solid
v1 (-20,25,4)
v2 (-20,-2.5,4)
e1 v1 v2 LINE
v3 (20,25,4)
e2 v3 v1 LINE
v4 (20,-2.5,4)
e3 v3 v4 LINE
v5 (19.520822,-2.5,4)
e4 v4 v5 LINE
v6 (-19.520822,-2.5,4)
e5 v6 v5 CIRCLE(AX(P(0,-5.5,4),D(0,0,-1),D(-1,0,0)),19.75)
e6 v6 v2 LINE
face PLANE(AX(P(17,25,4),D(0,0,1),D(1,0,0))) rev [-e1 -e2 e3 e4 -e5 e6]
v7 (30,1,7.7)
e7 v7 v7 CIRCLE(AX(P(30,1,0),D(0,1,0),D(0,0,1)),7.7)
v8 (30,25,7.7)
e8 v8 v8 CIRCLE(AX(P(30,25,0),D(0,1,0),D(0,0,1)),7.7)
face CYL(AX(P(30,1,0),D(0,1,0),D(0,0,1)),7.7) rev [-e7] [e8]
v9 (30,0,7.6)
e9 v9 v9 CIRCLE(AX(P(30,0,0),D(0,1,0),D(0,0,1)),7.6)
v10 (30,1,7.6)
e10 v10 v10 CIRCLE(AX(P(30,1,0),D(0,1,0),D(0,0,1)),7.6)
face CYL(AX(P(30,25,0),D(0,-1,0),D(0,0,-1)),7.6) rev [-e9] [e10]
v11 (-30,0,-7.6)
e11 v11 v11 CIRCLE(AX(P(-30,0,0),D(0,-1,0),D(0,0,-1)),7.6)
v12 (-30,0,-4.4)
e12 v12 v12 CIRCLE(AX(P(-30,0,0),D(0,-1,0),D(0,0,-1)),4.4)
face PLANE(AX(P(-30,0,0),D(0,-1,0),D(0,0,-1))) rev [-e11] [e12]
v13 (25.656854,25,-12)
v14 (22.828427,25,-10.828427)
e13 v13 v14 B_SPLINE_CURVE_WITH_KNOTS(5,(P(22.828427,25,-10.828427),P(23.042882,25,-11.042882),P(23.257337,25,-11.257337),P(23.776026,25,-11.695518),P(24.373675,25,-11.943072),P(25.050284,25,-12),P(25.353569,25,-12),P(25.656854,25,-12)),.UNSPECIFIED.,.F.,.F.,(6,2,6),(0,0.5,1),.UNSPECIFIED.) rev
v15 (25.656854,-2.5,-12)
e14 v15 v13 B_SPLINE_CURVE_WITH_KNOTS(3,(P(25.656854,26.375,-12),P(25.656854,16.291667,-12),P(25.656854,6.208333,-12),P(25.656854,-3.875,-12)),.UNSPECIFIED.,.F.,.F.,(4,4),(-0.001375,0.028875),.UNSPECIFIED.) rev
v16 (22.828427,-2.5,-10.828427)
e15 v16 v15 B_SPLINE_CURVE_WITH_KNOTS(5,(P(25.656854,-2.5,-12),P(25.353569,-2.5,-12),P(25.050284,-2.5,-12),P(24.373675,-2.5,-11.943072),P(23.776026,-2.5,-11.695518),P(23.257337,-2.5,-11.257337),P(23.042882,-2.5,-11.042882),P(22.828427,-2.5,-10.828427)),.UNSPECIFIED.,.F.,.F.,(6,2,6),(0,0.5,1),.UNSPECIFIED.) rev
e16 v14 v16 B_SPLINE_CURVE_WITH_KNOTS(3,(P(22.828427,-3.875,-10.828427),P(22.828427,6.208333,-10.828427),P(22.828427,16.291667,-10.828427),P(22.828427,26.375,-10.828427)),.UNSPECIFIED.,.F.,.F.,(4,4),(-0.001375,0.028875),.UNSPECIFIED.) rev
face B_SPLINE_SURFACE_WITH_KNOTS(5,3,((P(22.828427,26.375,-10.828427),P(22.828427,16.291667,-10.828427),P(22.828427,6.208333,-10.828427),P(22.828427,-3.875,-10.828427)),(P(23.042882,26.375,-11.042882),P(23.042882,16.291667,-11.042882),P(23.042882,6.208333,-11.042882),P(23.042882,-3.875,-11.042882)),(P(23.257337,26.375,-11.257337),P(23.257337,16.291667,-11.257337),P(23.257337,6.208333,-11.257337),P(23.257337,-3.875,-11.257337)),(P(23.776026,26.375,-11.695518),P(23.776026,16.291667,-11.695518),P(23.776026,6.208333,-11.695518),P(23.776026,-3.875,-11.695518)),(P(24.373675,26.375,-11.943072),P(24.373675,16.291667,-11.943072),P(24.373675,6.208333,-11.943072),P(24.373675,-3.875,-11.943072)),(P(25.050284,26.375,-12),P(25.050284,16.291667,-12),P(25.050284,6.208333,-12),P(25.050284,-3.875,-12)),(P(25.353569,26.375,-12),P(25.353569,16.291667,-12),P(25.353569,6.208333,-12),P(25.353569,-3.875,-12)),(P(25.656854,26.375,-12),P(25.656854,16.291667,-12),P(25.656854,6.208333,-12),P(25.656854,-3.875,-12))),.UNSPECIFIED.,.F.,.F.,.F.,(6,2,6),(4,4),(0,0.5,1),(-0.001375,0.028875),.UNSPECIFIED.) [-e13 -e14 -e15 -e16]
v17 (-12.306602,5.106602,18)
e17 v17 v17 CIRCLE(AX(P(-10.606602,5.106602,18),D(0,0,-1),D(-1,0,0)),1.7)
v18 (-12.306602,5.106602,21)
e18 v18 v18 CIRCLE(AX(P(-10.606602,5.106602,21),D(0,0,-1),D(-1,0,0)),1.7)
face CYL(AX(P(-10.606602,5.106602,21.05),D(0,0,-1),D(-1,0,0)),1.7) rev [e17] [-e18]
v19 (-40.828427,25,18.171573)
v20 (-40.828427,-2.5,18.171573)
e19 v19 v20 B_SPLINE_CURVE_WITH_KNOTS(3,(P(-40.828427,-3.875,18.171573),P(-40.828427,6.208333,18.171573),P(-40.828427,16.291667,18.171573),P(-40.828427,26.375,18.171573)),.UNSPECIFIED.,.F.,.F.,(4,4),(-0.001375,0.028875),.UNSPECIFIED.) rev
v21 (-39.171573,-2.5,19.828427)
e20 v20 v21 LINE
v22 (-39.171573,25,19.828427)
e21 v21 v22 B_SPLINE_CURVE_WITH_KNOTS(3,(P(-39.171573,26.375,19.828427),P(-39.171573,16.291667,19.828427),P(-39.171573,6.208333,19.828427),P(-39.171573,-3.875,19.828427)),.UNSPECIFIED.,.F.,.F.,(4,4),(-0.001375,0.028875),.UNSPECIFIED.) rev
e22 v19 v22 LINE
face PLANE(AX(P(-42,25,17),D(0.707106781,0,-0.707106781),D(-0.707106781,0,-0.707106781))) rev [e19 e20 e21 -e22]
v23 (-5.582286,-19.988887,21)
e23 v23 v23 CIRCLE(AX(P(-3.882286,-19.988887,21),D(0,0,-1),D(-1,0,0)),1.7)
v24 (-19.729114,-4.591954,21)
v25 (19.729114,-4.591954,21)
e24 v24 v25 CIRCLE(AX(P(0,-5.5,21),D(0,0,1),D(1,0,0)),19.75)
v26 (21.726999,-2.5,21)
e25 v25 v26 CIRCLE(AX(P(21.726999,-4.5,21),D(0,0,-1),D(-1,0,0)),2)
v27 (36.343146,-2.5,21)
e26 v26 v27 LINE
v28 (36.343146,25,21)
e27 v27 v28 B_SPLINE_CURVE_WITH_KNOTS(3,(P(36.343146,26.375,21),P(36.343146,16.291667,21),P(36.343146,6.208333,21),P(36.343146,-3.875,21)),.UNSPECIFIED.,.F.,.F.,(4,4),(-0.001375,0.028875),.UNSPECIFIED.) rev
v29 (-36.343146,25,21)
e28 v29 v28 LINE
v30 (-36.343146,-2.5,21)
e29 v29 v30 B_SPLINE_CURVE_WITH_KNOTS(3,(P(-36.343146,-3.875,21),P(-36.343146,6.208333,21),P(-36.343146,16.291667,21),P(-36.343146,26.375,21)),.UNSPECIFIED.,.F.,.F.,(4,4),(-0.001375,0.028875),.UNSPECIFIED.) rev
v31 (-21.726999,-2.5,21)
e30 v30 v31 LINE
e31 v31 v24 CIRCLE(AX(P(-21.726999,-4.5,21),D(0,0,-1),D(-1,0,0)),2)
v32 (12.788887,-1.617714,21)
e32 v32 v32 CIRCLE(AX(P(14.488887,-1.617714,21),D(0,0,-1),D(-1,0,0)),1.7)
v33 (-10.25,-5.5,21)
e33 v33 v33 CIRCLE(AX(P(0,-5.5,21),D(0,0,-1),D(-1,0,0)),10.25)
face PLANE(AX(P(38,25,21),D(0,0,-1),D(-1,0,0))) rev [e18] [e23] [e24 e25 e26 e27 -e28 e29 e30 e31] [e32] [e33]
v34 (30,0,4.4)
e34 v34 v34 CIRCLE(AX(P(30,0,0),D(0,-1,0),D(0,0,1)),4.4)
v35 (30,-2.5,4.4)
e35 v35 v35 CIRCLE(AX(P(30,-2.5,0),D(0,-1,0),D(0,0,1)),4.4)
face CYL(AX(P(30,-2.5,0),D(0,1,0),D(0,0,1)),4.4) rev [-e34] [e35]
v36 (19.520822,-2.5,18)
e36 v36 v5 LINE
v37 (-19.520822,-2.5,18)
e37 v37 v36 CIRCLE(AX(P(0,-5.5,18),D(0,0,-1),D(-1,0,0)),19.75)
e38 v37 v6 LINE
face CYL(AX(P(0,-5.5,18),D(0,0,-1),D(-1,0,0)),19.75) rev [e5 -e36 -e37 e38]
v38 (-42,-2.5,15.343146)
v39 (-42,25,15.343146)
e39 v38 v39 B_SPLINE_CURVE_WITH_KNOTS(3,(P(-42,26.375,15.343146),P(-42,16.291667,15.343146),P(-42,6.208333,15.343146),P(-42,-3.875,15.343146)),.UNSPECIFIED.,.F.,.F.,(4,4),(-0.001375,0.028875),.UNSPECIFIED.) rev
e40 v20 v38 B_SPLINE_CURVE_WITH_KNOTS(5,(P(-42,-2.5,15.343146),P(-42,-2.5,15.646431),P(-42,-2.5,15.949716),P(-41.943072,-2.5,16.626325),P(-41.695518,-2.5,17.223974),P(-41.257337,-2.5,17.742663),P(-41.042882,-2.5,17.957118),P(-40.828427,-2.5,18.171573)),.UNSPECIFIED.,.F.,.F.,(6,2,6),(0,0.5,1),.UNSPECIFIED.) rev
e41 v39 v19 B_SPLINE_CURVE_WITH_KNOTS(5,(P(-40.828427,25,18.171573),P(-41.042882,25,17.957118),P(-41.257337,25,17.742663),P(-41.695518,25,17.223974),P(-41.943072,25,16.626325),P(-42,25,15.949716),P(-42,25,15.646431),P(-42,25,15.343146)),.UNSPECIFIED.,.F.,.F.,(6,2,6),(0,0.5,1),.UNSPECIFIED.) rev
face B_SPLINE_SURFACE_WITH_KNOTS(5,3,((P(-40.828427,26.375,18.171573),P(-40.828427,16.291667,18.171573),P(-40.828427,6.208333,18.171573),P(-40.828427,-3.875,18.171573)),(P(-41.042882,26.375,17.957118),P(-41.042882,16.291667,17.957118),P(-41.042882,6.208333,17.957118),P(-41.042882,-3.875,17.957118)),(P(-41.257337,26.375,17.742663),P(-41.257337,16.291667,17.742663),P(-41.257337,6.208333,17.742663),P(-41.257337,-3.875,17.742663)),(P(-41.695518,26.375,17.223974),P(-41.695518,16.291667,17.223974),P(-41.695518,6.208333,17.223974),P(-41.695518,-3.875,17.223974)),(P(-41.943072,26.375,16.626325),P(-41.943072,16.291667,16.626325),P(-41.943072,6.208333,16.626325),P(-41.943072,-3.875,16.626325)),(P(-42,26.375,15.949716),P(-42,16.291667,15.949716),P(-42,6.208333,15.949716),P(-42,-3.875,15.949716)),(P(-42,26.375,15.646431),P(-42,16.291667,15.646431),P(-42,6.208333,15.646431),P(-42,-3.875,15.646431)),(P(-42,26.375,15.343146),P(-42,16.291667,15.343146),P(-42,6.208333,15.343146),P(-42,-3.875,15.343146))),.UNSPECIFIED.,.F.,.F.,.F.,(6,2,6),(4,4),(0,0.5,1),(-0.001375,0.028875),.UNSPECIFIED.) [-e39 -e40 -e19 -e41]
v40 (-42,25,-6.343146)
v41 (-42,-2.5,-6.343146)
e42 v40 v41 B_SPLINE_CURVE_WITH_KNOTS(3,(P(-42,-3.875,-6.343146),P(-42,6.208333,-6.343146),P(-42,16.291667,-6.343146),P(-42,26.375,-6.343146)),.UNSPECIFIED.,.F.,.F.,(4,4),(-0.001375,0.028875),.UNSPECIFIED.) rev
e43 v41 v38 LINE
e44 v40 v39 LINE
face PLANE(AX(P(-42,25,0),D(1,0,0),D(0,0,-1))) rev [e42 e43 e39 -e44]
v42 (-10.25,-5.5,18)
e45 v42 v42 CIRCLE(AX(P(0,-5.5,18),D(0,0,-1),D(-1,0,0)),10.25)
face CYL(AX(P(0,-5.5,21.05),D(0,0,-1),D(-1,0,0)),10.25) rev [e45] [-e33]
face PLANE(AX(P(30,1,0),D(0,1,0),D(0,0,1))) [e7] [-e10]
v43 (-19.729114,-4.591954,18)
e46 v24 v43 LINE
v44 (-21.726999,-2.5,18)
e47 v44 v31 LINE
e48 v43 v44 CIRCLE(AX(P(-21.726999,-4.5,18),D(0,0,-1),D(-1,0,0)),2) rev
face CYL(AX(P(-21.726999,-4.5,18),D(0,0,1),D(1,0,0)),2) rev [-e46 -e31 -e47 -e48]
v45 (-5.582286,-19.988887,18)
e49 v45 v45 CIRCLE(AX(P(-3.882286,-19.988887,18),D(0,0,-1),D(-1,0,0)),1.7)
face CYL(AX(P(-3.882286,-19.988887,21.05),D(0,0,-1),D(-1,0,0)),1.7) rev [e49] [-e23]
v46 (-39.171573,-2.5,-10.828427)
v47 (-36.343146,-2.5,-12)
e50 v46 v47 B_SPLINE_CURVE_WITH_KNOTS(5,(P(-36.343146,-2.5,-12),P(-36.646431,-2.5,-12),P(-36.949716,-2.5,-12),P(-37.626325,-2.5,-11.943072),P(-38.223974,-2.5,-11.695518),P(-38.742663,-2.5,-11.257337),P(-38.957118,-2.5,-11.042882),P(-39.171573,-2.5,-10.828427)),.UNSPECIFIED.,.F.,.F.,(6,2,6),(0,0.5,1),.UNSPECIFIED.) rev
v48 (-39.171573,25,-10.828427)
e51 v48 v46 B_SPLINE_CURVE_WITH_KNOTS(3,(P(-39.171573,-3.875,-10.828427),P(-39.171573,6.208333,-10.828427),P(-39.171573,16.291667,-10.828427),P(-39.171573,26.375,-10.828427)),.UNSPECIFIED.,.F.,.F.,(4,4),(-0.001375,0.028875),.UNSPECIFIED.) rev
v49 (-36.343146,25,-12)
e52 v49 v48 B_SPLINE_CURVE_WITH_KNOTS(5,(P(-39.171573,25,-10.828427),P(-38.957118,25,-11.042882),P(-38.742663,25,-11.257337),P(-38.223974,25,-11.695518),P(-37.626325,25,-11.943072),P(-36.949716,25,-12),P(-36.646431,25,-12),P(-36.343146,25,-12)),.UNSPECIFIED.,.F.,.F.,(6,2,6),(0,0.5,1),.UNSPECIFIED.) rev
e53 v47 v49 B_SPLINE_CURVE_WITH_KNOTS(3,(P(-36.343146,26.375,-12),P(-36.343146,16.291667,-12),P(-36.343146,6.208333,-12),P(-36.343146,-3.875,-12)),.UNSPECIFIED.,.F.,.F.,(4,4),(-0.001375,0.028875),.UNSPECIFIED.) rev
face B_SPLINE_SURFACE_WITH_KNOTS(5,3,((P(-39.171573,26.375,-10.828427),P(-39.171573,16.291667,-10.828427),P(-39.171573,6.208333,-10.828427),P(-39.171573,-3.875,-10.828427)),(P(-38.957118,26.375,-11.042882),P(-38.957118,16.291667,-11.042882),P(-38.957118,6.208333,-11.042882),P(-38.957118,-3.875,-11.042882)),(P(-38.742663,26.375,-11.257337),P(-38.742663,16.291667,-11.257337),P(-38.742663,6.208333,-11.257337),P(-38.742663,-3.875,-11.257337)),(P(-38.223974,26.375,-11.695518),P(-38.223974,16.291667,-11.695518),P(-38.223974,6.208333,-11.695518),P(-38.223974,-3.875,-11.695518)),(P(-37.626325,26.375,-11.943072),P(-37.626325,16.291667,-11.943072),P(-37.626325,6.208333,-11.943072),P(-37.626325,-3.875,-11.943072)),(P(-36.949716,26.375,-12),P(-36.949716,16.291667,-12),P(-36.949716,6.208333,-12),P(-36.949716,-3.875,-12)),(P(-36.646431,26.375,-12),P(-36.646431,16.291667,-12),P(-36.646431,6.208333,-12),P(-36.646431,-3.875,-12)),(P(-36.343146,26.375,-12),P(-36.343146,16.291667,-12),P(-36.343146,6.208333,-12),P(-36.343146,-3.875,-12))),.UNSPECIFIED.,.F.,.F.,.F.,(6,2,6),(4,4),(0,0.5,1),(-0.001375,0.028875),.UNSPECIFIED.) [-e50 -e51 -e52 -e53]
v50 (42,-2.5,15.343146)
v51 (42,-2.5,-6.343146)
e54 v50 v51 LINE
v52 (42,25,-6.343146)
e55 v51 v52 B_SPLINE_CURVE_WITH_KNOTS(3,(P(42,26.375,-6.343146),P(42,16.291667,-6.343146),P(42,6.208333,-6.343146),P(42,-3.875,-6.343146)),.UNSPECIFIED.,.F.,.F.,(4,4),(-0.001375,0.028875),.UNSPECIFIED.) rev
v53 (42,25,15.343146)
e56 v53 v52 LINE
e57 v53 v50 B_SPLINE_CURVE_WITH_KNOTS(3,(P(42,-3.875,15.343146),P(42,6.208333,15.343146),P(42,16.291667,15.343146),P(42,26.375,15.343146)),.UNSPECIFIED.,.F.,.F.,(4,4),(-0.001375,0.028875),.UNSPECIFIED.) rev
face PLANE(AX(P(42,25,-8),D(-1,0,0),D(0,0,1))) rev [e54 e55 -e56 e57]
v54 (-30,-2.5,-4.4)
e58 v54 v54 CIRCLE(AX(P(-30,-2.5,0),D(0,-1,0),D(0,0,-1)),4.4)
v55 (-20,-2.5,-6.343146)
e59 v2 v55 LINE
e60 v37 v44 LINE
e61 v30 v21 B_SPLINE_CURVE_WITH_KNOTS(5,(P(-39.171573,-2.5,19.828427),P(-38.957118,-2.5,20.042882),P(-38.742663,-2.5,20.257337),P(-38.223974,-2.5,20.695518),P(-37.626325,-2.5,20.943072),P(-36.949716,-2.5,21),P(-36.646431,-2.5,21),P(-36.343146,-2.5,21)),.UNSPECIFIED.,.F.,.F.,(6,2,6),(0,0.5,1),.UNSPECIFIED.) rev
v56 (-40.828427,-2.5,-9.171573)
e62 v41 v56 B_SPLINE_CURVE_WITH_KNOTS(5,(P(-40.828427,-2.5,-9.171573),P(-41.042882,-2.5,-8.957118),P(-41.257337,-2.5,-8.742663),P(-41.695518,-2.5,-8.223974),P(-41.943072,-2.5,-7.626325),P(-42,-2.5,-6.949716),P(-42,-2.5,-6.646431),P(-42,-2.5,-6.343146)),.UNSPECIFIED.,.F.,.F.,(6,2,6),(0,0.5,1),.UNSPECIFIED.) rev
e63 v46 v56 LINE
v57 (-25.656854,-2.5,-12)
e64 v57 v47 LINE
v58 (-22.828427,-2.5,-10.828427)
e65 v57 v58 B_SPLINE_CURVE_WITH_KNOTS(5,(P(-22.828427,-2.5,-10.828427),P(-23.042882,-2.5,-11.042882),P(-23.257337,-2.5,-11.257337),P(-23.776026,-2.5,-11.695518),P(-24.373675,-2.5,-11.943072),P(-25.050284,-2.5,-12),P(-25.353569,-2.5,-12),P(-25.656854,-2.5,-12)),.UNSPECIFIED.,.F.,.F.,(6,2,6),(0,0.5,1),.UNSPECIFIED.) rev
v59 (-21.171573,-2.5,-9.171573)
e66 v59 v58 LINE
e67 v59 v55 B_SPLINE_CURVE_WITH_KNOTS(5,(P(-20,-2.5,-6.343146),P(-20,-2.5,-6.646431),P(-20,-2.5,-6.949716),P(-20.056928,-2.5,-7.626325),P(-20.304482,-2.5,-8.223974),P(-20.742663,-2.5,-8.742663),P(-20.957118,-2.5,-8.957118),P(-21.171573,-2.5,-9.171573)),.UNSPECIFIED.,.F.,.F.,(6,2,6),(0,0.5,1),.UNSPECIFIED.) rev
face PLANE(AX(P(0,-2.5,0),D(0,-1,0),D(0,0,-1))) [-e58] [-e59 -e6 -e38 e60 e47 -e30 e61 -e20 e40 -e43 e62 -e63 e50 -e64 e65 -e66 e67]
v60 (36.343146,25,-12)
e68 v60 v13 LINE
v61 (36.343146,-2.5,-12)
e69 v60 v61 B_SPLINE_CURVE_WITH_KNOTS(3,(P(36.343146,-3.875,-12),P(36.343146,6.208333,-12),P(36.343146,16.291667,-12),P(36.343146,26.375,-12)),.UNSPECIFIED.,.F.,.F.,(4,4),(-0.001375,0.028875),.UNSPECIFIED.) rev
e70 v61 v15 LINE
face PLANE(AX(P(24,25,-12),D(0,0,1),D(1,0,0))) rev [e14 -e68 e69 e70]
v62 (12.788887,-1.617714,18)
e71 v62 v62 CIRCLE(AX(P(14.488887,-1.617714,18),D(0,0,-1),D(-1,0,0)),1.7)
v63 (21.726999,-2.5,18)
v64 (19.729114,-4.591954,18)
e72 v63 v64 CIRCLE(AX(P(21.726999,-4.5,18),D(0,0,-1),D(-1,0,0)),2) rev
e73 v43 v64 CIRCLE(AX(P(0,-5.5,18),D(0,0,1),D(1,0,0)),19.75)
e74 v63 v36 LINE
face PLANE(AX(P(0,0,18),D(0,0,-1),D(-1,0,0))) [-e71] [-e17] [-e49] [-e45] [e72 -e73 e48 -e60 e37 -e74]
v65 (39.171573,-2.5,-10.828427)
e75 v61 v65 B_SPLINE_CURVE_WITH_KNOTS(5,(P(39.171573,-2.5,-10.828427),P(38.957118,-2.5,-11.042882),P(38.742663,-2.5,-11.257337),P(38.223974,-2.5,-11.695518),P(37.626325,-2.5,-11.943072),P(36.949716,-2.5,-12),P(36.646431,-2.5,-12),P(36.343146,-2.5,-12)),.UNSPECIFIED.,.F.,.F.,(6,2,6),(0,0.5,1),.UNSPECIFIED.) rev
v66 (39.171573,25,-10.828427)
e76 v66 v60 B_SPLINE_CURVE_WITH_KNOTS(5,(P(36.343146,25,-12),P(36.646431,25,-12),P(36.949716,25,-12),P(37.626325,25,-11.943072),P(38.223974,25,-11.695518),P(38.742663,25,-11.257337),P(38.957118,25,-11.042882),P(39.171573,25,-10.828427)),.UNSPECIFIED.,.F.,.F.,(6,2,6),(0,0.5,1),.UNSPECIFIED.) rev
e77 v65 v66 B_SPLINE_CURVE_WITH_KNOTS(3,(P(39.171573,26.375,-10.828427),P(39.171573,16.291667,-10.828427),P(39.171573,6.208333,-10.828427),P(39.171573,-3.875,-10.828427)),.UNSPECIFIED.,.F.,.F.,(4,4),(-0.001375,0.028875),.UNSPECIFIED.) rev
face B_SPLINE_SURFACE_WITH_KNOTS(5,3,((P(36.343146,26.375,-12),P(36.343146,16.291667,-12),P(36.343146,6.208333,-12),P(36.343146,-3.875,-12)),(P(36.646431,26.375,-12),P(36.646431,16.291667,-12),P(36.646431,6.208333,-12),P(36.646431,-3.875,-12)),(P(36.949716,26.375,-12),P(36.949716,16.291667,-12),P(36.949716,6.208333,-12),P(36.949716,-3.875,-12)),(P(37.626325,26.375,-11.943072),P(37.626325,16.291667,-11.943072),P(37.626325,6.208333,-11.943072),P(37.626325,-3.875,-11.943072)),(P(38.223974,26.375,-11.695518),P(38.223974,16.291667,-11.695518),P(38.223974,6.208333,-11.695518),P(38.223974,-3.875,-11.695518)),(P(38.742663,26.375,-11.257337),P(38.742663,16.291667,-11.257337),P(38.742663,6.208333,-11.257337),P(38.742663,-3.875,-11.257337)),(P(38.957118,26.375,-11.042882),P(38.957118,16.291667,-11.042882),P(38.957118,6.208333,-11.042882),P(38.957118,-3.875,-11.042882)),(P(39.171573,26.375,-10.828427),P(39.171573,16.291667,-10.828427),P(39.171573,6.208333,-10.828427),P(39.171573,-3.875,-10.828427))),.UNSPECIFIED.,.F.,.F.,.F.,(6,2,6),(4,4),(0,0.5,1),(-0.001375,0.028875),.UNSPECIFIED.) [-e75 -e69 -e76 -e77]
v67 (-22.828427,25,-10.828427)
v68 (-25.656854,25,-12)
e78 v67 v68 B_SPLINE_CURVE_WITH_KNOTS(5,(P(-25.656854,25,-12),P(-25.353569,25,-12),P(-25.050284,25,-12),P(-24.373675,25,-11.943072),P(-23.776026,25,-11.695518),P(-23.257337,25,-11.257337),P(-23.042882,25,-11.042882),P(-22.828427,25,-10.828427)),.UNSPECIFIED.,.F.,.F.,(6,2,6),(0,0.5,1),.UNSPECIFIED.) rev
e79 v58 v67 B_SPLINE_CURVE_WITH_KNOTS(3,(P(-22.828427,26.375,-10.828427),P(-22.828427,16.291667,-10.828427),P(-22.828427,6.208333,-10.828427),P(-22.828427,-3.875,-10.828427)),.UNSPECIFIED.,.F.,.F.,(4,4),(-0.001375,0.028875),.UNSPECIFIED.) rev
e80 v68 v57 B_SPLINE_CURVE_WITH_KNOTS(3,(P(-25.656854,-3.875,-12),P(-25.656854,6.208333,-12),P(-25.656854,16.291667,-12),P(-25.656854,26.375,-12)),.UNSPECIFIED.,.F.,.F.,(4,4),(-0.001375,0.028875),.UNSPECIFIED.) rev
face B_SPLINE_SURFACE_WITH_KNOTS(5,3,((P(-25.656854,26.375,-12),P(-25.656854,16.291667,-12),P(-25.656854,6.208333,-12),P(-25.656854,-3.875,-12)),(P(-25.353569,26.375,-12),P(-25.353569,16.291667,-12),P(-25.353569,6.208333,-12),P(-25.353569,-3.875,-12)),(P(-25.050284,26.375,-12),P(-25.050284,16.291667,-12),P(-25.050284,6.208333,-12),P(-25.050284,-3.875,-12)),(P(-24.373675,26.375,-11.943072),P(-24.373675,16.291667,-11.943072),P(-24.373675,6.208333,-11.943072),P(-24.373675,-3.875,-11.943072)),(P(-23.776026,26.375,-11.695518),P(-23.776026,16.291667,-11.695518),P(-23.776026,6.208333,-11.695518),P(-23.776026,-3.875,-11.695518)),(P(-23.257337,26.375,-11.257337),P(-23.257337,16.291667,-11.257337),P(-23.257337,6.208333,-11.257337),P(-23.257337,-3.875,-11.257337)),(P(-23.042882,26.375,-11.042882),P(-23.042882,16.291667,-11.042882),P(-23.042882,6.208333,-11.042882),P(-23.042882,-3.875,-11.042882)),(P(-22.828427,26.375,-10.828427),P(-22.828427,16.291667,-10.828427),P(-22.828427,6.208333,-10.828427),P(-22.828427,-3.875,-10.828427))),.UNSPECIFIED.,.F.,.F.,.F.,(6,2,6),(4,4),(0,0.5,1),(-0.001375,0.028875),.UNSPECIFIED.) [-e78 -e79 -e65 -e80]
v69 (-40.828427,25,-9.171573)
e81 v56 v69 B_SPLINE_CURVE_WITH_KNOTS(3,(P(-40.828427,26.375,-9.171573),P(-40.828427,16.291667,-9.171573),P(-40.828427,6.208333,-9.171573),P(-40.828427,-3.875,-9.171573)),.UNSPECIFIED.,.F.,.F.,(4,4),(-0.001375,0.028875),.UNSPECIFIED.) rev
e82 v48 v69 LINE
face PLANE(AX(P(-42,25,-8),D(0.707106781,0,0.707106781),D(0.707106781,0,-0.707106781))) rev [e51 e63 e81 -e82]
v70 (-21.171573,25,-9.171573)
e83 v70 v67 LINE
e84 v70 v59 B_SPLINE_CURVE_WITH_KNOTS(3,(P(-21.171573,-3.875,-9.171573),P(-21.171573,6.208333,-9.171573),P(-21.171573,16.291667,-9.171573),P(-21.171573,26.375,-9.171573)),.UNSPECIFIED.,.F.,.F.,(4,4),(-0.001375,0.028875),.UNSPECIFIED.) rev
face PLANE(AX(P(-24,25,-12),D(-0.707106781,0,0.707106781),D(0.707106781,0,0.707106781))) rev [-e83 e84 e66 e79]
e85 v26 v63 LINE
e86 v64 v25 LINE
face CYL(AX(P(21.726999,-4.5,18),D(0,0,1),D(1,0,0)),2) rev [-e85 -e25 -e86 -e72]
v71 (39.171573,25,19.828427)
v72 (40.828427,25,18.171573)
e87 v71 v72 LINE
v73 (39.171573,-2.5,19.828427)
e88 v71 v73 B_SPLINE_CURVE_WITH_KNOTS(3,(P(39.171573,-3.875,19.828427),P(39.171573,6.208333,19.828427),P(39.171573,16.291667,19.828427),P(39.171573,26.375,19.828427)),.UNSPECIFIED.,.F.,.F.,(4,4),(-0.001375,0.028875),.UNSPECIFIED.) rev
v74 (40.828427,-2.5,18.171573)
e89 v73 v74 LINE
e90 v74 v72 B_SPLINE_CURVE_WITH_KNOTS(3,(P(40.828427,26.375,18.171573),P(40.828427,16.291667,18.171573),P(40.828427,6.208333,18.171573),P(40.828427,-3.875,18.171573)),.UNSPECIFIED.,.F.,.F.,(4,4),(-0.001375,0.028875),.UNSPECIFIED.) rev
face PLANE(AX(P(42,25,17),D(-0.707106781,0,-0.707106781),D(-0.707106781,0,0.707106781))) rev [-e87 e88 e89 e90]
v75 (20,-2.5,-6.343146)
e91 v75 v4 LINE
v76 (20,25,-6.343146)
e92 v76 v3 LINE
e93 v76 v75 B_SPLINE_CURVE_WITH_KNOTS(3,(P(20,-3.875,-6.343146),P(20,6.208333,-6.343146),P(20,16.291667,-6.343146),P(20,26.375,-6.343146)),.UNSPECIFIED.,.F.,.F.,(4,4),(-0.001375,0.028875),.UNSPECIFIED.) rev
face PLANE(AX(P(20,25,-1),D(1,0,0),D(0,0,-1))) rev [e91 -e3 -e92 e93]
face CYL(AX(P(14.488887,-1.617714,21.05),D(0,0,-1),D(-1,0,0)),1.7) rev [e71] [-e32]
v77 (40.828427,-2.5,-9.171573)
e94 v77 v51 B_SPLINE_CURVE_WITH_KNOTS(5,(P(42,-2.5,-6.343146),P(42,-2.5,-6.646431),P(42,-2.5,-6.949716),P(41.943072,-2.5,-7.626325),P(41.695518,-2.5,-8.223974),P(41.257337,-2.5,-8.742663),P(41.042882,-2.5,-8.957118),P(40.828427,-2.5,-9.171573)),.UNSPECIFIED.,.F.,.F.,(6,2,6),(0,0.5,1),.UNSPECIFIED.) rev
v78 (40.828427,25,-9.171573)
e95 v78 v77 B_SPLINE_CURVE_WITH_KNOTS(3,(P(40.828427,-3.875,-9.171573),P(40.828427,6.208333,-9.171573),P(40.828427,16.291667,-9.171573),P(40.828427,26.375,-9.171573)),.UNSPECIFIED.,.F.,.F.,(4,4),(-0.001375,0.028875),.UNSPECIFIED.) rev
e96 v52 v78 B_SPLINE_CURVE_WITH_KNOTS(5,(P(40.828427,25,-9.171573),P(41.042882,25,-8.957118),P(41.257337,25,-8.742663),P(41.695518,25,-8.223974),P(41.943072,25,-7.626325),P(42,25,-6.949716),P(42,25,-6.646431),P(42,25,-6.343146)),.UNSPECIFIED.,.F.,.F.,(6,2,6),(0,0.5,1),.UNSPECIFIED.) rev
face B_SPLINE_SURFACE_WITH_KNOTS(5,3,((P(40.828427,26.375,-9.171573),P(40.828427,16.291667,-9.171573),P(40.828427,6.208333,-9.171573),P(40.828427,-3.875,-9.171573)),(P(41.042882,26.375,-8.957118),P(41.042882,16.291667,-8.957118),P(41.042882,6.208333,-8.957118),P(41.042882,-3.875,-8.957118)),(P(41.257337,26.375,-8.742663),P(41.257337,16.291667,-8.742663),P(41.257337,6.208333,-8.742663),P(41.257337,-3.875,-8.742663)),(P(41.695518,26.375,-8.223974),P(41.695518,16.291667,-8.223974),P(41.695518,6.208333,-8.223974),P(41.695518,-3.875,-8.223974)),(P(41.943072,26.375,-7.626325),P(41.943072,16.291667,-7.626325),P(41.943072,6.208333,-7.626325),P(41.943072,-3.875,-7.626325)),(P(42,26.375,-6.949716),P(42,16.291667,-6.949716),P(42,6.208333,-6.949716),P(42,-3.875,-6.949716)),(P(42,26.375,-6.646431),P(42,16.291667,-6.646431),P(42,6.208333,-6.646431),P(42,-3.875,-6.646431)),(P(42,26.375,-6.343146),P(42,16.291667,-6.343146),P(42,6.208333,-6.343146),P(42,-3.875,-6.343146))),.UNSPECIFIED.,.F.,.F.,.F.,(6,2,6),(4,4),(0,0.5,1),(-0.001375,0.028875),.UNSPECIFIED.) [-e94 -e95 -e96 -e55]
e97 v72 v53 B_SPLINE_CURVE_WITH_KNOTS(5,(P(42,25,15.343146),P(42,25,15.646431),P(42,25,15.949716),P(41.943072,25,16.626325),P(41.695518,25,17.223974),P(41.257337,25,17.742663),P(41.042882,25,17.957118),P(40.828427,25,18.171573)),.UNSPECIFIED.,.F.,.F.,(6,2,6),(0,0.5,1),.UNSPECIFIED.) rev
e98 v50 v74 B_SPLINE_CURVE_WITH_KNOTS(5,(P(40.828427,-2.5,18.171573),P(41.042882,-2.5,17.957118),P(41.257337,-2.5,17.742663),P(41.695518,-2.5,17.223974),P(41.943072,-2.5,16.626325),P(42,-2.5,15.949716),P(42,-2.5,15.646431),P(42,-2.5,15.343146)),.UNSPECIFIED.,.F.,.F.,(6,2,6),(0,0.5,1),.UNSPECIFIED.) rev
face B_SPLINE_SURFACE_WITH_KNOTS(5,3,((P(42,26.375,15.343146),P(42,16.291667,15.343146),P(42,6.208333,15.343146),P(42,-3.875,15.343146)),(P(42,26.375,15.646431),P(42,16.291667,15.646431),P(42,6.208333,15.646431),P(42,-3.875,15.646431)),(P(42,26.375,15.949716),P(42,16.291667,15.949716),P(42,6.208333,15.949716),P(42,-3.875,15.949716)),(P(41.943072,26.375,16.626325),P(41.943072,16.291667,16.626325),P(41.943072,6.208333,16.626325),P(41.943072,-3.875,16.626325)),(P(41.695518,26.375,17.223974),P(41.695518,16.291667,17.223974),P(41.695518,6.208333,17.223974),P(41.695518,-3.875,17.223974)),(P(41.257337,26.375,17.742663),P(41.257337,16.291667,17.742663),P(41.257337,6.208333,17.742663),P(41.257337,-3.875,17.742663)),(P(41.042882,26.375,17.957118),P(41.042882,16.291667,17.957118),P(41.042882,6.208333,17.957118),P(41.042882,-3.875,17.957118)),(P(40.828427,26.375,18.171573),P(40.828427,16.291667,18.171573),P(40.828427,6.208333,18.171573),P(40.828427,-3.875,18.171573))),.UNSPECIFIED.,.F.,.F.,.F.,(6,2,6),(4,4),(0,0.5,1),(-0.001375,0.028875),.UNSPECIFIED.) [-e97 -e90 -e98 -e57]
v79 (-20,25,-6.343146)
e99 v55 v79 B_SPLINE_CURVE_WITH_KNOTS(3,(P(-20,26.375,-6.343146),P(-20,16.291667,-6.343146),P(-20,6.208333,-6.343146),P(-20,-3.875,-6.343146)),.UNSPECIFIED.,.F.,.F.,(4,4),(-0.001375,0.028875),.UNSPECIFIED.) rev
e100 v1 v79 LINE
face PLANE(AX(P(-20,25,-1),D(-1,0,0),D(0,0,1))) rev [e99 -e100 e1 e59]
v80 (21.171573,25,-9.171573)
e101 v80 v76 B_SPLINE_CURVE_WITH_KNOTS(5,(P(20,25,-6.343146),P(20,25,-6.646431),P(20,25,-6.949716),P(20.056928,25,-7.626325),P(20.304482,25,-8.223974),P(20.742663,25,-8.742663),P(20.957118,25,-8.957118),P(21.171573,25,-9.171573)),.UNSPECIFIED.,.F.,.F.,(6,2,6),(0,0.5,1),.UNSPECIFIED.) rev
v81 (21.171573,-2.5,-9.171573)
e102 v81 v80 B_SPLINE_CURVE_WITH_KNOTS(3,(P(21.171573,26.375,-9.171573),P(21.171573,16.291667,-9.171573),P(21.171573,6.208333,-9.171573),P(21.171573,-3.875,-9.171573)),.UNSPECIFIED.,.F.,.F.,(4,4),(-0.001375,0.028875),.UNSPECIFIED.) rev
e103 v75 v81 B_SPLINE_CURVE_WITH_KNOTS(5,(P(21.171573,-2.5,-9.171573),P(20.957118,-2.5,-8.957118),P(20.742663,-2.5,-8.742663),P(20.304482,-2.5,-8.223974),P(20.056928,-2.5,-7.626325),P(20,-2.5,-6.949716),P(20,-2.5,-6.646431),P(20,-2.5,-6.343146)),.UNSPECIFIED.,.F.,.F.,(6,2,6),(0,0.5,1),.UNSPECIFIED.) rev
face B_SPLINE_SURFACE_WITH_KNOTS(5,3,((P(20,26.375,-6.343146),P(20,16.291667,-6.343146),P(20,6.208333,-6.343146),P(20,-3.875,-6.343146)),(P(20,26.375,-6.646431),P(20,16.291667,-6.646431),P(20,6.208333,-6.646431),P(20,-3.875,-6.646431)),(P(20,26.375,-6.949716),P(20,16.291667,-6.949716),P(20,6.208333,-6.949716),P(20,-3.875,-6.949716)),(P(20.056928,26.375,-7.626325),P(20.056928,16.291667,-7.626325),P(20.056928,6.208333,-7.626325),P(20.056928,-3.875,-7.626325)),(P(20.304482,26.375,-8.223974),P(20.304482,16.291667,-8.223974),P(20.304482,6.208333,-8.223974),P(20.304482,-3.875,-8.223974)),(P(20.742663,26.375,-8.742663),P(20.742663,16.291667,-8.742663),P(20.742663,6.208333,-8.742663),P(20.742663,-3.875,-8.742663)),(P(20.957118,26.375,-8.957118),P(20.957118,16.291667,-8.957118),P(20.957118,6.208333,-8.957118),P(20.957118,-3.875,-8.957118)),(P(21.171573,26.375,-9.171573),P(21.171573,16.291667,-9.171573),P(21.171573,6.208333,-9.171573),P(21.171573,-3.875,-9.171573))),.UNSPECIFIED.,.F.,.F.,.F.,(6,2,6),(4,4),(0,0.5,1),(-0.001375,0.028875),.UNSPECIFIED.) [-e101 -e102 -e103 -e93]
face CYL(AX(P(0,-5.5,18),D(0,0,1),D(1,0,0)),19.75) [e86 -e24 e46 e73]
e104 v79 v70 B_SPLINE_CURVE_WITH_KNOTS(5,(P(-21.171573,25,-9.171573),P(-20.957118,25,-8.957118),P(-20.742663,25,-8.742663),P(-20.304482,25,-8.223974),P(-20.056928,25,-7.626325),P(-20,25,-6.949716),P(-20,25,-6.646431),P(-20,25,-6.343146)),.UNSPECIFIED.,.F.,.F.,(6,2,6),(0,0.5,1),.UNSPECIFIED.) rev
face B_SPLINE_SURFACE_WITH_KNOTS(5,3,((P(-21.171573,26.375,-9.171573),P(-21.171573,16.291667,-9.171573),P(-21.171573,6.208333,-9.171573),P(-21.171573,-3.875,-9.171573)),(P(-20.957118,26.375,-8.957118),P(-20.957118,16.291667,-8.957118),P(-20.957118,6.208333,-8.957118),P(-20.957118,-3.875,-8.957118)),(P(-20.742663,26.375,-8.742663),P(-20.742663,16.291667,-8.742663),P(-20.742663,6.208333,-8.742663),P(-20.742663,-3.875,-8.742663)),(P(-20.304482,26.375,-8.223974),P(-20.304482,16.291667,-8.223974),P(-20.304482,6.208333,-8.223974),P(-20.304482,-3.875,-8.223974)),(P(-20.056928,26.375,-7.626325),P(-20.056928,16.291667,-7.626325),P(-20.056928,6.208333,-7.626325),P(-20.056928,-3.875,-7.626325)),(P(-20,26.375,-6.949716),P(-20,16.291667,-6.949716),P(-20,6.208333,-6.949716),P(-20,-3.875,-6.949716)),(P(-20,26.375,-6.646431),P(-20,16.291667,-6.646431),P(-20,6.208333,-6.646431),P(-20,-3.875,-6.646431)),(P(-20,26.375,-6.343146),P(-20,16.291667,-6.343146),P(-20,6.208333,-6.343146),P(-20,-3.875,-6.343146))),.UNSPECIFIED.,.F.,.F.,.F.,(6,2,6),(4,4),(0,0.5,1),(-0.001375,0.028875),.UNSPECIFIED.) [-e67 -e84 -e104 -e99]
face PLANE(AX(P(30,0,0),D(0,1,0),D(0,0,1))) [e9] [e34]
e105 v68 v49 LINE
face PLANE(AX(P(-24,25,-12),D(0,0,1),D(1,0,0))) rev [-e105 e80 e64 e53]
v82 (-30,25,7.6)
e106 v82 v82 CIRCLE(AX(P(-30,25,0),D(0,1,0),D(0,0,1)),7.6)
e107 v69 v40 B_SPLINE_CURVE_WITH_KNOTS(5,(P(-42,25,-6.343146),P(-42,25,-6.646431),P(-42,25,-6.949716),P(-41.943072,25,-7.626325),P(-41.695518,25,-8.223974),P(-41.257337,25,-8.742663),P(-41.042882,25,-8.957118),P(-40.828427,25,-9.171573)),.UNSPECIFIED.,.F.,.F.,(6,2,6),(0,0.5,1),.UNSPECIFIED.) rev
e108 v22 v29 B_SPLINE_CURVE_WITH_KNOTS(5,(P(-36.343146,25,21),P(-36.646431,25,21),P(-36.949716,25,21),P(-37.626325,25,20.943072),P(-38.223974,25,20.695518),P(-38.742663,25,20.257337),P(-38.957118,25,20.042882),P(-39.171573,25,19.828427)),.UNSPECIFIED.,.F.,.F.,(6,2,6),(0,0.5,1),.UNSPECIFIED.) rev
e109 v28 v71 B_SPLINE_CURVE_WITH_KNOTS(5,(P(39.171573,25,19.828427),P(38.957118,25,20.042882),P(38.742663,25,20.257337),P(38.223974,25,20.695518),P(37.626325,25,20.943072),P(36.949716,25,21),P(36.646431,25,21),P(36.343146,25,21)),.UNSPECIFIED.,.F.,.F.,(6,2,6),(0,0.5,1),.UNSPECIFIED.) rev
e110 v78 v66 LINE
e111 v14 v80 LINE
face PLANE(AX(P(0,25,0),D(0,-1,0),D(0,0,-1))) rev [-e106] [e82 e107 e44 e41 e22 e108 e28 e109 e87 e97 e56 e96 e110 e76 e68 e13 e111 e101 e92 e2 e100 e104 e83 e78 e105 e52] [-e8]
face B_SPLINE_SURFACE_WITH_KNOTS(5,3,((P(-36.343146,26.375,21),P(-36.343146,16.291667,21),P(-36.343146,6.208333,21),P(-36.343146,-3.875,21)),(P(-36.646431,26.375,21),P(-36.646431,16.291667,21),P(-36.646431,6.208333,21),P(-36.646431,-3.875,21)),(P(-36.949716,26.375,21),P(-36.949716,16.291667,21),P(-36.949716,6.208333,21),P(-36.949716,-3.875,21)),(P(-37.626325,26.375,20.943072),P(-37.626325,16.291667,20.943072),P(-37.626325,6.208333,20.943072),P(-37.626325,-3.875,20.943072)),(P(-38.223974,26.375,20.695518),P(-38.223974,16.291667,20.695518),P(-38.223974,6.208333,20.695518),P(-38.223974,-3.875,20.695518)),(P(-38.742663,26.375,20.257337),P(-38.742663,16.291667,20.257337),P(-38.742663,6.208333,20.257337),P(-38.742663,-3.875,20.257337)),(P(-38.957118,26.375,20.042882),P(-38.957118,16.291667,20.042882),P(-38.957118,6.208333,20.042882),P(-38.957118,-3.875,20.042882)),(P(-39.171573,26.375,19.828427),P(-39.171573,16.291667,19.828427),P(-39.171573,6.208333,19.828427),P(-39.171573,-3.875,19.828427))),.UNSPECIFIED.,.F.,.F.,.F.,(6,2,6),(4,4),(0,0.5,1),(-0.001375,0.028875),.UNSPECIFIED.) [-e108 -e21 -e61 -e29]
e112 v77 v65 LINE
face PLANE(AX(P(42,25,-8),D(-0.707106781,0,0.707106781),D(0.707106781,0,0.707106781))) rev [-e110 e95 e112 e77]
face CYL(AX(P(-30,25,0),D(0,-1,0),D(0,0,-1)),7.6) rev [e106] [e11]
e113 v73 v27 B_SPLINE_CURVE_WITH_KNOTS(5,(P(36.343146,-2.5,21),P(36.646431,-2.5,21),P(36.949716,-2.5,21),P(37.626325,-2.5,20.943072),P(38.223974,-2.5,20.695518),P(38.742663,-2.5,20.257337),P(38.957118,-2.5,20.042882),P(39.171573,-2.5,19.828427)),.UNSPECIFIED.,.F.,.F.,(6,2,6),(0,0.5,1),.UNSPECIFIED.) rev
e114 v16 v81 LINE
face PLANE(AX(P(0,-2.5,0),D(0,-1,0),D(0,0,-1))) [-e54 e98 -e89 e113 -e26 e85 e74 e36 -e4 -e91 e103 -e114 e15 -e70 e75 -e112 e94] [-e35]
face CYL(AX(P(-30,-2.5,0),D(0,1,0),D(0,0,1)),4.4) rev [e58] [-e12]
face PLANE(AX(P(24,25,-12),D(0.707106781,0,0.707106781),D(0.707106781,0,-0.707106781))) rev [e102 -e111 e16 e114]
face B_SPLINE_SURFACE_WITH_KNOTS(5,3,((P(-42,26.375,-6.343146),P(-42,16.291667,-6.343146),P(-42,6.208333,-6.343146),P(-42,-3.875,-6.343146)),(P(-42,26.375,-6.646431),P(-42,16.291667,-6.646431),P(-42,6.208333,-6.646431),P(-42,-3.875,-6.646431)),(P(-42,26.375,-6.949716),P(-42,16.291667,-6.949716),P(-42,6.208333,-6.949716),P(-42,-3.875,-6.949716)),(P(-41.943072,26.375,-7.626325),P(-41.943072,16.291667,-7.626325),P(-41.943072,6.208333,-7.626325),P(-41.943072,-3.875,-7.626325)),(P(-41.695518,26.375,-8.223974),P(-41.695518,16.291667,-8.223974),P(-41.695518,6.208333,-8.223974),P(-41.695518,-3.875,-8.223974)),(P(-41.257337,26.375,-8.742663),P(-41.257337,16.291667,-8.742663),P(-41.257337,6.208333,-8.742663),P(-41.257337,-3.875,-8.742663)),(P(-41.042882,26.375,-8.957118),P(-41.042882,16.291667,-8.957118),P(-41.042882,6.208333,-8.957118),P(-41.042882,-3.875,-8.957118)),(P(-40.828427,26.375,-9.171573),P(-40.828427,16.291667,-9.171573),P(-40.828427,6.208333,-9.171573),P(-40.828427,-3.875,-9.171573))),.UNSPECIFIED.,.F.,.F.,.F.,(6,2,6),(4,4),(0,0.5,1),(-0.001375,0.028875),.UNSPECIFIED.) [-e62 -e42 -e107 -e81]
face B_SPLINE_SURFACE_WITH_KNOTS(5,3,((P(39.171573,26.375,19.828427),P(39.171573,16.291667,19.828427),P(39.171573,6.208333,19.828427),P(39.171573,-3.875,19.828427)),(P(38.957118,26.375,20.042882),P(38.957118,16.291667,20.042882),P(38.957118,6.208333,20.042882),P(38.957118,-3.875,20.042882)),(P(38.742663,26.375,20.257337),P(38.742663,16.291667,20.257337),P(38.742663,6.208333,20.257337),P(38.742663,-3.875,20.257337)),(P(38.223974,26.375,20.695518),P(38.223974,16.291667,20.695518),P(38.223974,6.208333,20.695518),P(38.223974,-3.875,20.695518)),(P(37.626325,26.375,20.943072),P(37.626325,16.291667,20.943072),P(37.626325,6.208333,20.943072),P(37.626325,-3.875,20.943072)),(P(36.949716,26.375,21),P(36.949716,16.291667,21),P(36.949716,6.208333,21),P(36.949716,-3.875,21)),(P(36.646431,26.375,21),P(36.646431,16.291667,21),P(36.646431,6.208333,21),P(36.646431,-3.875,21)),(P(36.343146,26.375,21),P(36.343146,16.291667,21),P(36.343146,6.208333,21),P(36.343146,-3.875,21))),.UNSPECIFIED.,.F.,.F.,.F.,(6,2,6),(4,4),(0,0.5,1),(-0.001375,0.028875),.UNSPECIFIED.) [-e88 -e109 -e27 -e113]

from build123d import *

# Parameters (mm, degrees)
ESQUISSE1_R             = 7.6
BOSS_EXTRU_1_DEPTH      = 25
ESQUISSE3_R             = 7.6
ESQUISSE3_R_2           = 4.4
BOSS_EXTRU_3_DEPTH      = 2.5
BOSS_EXTRU_3_2_DEPTH    = 2.5
BOSS_EXTRU_5_START      = -2.5
ESQUISSE1_4_R           = 7.6
BOSS_EXTRU_5_DEPTH      = 2.5
ESQUISSE7_R             = 19.75
ESQUISSE7_R_2           = 1.7
ESQUISSE7_R_3           = 10.25
ENL_V_MAT_EXTRU_1_DEPTH = 14
BOSS_EXTRU_9_START      = -3
BOSS_EXTRU_9_DEPTH      = 3
ESQUISSE7_4_R           = 1.7
ENL_V_MAT_EXTRU_2_DEPTH = 52.87063246
ENL_V_START             = -24
ESQUISSE11_R            = 7.6
ESQUISSE11_R_2          = 7.7
ENL_V_MAT_EXTRU_3_DEPTH = 24
CONG_2_R                = 2


with BuildPart() as part:
    # Esquisse1 → Boss.-Extru.1 (new body)
    with BuildSketch(Plane(origin=(0, 0, 0), x_dir=(1, 0, 0), z_dir=(0, 1, 0))):
        Polygon((-26, -21), (26, -21), (38, -21), (42, -17), (42, 0), (42, 8), (38, 12), (24, 12), (20, 8), (20, 1), (20, -4), (17, -4), (-17, -4), (-20, -4), (-20, 1), (-20, 8), (-24, 12), (-38, 12), (-42, 8), (-42, 0), (-42, -17), (-38, -21), align=None)
        with Locations(Location((-30, 0, 0), (0, 0, 270))):
            Circle(ESQUISSE1_R, mode=Mode.SUBTRACT)
        with Locations(Location((30, 0, 0), (0, 0, 90))):
            Circle(ESQUISSE1_R, mode=Mode.SUBTRACT)
    extrude(amount=BOSS_EXTRU_1_DEPTH)


with BuildPart() as body_2:
    # Esquisse3 → Boss.-Extru.3 (new body)
    with BuildSketch(Plane.XZ):
        with Locations(Location((-30, 0, 0), (0, 0, 90))):
            Circle(ESQUISSE3_R)
        with Locations(Location((-30, 0, 0), (0, 0, 270))):
            Circle(ESQUISSE3_R_2, mode=Mode.SUBTRACT)
    extrude(amount=BOSS_EXTRU_3_DEPTH)


with BuildPart() as body_3:
    # Esquisse3 → Boss.-Extru.3 2 (new body)
    with BuildSketch(Plane.XZ):
        with Locations(Location((30, 0, 0), (0, 0, 270))):
            Circle(ESQUISSE3_R)
        with Locations(Location((30, 0, 0), (0, 0, 90))):
            Circle(ESQUISSE3_R_2, mode=Mode.SUBTRACT)
    extrude(amount=BOSS_EXTRU_3_2_DEPTH)


with BuildPart() as boss_extru_5_tool:
    # Esquisse1<4> → Boss.-Extru.5 (new body)
    with BuildSketch(Plane(origin=(0, 0, 0), x_dir=(1, 0, 0), z_dir=(0, 1, 0)).offset(BOSS_EXTRU_5_START)):
        Polygon((-26, -21), (26, -21), (38, -21), (42, -17), (42, 0), (42, 8), (38, 12), (24, 12), (20, 8), (20, 1), (20, -4), (17, -4), (-17, -4), (-20, -4), (-20, 1), (-20, 8), (-24, 12), (-38, 12), (-42, 8), (-42, 0), (-42, -17), (-38, -21), align=None)
        with Locations(Location((-30, 0, 0), (0, 0, 90))):
            Circle(ESQUISSE1_4_R, mode=Mode.SUBTRACT)
        with Locations(Location((30, 0, 0), (0, 0, 90))):
            Circle(ESQUISSE1_4_R, mode=Mode.SUBTRACT)
    extrude(amount=BOSS_EXTRU_5_DEPTH)


with BuildPart() as part_1:
    add(part.part)


with BuildPart() as part_2:
    # Boss.-Extru.5: joined with boss_extru_5_tool
    add(part_1.part.fuse(boss_extru_5_tool.part, body_2.part, body_3.part, tol=0.00001))

    # Congé1
    # a fillet whose section is not a circle: 4 mm, written as the material it takes off along each edge
    with BuildSketch(Plane(origin=(-42, 29.142135624, 17), x_dir=(0, 0, -1), z_dir=(0, -1, 0)), Plane(origin=(-38, -6.642135624, -12), x_dir=(-0.707106781186547, 0, 0.7071067811865481), z_dir=(0, 1, 0)), Plane(origin=(-24, -6.642135624, -12), x_dir=(-1, 0, 0), z_dir=(0, 1, 0)), Plane(origin=(-20, -6.642135624, -8), x_dir=(-0.707106781186547, 0, -0.7071067811865481), z_dir=(0, 1, 0)), Plane(origin=(42, -6.642135624, 17), x_dir=(0, 0, -1), z_dir=(0, 1, 0)), Plane(origin=(42, -6.642135624, -8), x_dir=(-0.7071067811865487, 0, -0.7071067811865465), z_dir=(0, 1, 0)), Plane(origin=(38, -6.642135624, -12), x_dir=(-1, 0, 0), z_dir=(0, 1, 0)), Plane(origin=(24, -6.642135624, -12), x_dir=(-0.7071067811865459, 0, 0.7071067811865491), z_dir=(0, 1, 0)), Plane(origin=(20, -6.642135624, -8), x_dir=(0, 0, 1), z_dir=(0, 1, 0))) as cong_1_piece_1:
        with BuildLine():
            add(Edge.make_bspline([(1.656854249, 0), (1.35356905, 0), (1.050283851, 0), (0.373674798, 0.056927592), (-0.223974097, 0.30448187), (-0.742662833, 0.742662833), (-0.957117854, 0.957117854), (-1.171572875, 1.171572875)], knots=[0, 0, 0, 0, 0, 0, 0.5, 0.5, 1, 1, 1, 1, 1, 1], degree=5))
            Line((-1.171572875, 1.171572875), (0, 0))
            Line((0, 0), (1.656854249, 0))
        make_face()
    extrude(amount=35.784271247, mode=Mode.SUBTRACT)
    with BuildSketch(Plane(origin=(-42, 29.142135624, -8), x_dir=(0, 0, 1), z_dir=(0, -1, 0)), Plane(origin=(-38, 29.142135624, 21), x_dir=(1, 0, 0), z_dir=(0, -1, 0)), Plane(origin=(38, -6.642135624, 21), x_dir=(-1, 0, 0), z_dir=(0, 1, 0))) as cong_1_piece_2:
        with BuildLine():
            add(Edge.make_bspline([(1.656854249, 0), (1.35356905, 0), (1.050283851, 0), (0.373674798, -0.056927592), (-0.223974097, -0.30448187), (-0.742662833, -0.742662833), (-0.957117854, -0.957117854), (-1.171572875, -1.171572875)], knots=[0, 0, 0, 0, 0, 0, 0.5, 0.5, 1, 1, 1, 1, 1, 1], degree=5))
            Line((-1.171572875, -1.171572875), (0, 0))
            Line((0, 0), (1.656854249, 0))
        make_face()
    extrude(amount=35.784271247, mode=Mode.SUBTRACT)

    # Esquisse7 → Enlèv. mat.-Extru.1 (cut)
    with BuildSketch(Plane(origin=(0, 0, 4), x_dir=(-1, 0, 0), z_dir=(0, 0, -1))):
        with Locations((0, -5.5)):
            Circle(ESQUISSE7_R)
        with Locations((-14.488887394, -1.617714323)):
            Circle(ESQUISSE7_R_2, mode=Mode.SUBTRACT)
        with Locations((10.606601718, 5.106601718)):
            Circle(ESQUISSE7_R_2, mode=Mode.SUBTRACT)
        with Locations((3.882285677, -19.988887394)):
            Circle(ESQUISSE7_R_2, mode=Mode.SUBTRACT)
        with Locations((0, -5.5)):
            Circle(ESQUISSE7_R_3, mode=Mode.SUBTRACT)
        with Locations((-9.899494937, -15.399494937)):
            Circle(ESQUISSE7_R_2, mode=Mode.SUBTRACT)
    extrude(amount=-ENL_V_MAT_EXTRU_1_DEPTH, mode=Mode.SUBTRACT)

    # Esquisse10 → Boss.-Extru.9 (add)
    with BuildSketch(Plane.XY.offset(21).offset(BOSS_EXTRU_9_START)):
        with BuildLine():
            Line((19.520822216, -2.5), (-19.520822216, -2.5))
            ThreePointArc((-19.520822216, -2.5), (0, -25.25), (19.520822216, -2.5))
        make_face()
    extrude(amount=BOSS_EXTRU_9_DEPTH)

    # Esquisse7<4> → Enlèv. mat.-Extru.2 (cut, through all)
    with BuildSketch(Plane(origin=(0, 0, 4), x_dir=(-1, 0, 0), z_dir=(0, 0, -1))):
        with Locations((3.882285677, -19.988887394)):
            Circle(ESQUISSE7_4_R)
        with Locations((-14.488887394, -1.617714323)):
            Circle(ESQUISSE7_4_R)
        with Locations((10.606601718, 5.106601718)):
            Circle(ESQUISSE7_4_R)
        with BuildLine():
            Line((-9.801147892, -2.5), (9.801147892, -2.5))
            ThreePointArc((9.801147892, -2.5), (0, 4.75), (-9.801147892, -2.5))
        make_face()
        with BuildLine():
            ThreePointArc((10.25, -5.5), (10.137165923, -3.983303902), (9.801147892, -2.5))
            Line((9.801147892, -2.5), (-9.801147892, -2.5))
            ThreePointArc((-9.801147892, -2.5), (-1.516696098, -15.637165923), (10.25, -5.5))
        make_face()
    extrude(amount=-ENL_V_MAT_EXTRU_2_DEPTH, mode=Mode.SUBTRACT)

    # Esquisse11 → Enlèv. mat.-Extru.3 (cut)
    with BuildSketch(Plane(origin=(0, 25, 0), x_dir=(1, 0, 0), z_dir=(0, 1, 0)).offset(ENL_V_START)):
        with Locations(Location((-30, 0, 0), (0, 0, 90))):
            Circle(ESQUISSE11_R)
        with Locations(Location((30, 0, 0), (0, 0, 270))):
            Circle(ESQUISSE11_R_2)
    extrude(amount=ENL_V_MAT_EXTRU_3_DEPTH, mode=Mode.SUBTRACT)

    # Congé2
    cong_2_edges = [part_2.edges().sort_by_distance(p)[0] for p in [
        (-19.520822216, -2.5, 19.5),
        (19.520822216, -2.5, 19.5),
    ]]
    fillet(cong_2_edges, radius=CONG_2_R)


solid = part_2.part
